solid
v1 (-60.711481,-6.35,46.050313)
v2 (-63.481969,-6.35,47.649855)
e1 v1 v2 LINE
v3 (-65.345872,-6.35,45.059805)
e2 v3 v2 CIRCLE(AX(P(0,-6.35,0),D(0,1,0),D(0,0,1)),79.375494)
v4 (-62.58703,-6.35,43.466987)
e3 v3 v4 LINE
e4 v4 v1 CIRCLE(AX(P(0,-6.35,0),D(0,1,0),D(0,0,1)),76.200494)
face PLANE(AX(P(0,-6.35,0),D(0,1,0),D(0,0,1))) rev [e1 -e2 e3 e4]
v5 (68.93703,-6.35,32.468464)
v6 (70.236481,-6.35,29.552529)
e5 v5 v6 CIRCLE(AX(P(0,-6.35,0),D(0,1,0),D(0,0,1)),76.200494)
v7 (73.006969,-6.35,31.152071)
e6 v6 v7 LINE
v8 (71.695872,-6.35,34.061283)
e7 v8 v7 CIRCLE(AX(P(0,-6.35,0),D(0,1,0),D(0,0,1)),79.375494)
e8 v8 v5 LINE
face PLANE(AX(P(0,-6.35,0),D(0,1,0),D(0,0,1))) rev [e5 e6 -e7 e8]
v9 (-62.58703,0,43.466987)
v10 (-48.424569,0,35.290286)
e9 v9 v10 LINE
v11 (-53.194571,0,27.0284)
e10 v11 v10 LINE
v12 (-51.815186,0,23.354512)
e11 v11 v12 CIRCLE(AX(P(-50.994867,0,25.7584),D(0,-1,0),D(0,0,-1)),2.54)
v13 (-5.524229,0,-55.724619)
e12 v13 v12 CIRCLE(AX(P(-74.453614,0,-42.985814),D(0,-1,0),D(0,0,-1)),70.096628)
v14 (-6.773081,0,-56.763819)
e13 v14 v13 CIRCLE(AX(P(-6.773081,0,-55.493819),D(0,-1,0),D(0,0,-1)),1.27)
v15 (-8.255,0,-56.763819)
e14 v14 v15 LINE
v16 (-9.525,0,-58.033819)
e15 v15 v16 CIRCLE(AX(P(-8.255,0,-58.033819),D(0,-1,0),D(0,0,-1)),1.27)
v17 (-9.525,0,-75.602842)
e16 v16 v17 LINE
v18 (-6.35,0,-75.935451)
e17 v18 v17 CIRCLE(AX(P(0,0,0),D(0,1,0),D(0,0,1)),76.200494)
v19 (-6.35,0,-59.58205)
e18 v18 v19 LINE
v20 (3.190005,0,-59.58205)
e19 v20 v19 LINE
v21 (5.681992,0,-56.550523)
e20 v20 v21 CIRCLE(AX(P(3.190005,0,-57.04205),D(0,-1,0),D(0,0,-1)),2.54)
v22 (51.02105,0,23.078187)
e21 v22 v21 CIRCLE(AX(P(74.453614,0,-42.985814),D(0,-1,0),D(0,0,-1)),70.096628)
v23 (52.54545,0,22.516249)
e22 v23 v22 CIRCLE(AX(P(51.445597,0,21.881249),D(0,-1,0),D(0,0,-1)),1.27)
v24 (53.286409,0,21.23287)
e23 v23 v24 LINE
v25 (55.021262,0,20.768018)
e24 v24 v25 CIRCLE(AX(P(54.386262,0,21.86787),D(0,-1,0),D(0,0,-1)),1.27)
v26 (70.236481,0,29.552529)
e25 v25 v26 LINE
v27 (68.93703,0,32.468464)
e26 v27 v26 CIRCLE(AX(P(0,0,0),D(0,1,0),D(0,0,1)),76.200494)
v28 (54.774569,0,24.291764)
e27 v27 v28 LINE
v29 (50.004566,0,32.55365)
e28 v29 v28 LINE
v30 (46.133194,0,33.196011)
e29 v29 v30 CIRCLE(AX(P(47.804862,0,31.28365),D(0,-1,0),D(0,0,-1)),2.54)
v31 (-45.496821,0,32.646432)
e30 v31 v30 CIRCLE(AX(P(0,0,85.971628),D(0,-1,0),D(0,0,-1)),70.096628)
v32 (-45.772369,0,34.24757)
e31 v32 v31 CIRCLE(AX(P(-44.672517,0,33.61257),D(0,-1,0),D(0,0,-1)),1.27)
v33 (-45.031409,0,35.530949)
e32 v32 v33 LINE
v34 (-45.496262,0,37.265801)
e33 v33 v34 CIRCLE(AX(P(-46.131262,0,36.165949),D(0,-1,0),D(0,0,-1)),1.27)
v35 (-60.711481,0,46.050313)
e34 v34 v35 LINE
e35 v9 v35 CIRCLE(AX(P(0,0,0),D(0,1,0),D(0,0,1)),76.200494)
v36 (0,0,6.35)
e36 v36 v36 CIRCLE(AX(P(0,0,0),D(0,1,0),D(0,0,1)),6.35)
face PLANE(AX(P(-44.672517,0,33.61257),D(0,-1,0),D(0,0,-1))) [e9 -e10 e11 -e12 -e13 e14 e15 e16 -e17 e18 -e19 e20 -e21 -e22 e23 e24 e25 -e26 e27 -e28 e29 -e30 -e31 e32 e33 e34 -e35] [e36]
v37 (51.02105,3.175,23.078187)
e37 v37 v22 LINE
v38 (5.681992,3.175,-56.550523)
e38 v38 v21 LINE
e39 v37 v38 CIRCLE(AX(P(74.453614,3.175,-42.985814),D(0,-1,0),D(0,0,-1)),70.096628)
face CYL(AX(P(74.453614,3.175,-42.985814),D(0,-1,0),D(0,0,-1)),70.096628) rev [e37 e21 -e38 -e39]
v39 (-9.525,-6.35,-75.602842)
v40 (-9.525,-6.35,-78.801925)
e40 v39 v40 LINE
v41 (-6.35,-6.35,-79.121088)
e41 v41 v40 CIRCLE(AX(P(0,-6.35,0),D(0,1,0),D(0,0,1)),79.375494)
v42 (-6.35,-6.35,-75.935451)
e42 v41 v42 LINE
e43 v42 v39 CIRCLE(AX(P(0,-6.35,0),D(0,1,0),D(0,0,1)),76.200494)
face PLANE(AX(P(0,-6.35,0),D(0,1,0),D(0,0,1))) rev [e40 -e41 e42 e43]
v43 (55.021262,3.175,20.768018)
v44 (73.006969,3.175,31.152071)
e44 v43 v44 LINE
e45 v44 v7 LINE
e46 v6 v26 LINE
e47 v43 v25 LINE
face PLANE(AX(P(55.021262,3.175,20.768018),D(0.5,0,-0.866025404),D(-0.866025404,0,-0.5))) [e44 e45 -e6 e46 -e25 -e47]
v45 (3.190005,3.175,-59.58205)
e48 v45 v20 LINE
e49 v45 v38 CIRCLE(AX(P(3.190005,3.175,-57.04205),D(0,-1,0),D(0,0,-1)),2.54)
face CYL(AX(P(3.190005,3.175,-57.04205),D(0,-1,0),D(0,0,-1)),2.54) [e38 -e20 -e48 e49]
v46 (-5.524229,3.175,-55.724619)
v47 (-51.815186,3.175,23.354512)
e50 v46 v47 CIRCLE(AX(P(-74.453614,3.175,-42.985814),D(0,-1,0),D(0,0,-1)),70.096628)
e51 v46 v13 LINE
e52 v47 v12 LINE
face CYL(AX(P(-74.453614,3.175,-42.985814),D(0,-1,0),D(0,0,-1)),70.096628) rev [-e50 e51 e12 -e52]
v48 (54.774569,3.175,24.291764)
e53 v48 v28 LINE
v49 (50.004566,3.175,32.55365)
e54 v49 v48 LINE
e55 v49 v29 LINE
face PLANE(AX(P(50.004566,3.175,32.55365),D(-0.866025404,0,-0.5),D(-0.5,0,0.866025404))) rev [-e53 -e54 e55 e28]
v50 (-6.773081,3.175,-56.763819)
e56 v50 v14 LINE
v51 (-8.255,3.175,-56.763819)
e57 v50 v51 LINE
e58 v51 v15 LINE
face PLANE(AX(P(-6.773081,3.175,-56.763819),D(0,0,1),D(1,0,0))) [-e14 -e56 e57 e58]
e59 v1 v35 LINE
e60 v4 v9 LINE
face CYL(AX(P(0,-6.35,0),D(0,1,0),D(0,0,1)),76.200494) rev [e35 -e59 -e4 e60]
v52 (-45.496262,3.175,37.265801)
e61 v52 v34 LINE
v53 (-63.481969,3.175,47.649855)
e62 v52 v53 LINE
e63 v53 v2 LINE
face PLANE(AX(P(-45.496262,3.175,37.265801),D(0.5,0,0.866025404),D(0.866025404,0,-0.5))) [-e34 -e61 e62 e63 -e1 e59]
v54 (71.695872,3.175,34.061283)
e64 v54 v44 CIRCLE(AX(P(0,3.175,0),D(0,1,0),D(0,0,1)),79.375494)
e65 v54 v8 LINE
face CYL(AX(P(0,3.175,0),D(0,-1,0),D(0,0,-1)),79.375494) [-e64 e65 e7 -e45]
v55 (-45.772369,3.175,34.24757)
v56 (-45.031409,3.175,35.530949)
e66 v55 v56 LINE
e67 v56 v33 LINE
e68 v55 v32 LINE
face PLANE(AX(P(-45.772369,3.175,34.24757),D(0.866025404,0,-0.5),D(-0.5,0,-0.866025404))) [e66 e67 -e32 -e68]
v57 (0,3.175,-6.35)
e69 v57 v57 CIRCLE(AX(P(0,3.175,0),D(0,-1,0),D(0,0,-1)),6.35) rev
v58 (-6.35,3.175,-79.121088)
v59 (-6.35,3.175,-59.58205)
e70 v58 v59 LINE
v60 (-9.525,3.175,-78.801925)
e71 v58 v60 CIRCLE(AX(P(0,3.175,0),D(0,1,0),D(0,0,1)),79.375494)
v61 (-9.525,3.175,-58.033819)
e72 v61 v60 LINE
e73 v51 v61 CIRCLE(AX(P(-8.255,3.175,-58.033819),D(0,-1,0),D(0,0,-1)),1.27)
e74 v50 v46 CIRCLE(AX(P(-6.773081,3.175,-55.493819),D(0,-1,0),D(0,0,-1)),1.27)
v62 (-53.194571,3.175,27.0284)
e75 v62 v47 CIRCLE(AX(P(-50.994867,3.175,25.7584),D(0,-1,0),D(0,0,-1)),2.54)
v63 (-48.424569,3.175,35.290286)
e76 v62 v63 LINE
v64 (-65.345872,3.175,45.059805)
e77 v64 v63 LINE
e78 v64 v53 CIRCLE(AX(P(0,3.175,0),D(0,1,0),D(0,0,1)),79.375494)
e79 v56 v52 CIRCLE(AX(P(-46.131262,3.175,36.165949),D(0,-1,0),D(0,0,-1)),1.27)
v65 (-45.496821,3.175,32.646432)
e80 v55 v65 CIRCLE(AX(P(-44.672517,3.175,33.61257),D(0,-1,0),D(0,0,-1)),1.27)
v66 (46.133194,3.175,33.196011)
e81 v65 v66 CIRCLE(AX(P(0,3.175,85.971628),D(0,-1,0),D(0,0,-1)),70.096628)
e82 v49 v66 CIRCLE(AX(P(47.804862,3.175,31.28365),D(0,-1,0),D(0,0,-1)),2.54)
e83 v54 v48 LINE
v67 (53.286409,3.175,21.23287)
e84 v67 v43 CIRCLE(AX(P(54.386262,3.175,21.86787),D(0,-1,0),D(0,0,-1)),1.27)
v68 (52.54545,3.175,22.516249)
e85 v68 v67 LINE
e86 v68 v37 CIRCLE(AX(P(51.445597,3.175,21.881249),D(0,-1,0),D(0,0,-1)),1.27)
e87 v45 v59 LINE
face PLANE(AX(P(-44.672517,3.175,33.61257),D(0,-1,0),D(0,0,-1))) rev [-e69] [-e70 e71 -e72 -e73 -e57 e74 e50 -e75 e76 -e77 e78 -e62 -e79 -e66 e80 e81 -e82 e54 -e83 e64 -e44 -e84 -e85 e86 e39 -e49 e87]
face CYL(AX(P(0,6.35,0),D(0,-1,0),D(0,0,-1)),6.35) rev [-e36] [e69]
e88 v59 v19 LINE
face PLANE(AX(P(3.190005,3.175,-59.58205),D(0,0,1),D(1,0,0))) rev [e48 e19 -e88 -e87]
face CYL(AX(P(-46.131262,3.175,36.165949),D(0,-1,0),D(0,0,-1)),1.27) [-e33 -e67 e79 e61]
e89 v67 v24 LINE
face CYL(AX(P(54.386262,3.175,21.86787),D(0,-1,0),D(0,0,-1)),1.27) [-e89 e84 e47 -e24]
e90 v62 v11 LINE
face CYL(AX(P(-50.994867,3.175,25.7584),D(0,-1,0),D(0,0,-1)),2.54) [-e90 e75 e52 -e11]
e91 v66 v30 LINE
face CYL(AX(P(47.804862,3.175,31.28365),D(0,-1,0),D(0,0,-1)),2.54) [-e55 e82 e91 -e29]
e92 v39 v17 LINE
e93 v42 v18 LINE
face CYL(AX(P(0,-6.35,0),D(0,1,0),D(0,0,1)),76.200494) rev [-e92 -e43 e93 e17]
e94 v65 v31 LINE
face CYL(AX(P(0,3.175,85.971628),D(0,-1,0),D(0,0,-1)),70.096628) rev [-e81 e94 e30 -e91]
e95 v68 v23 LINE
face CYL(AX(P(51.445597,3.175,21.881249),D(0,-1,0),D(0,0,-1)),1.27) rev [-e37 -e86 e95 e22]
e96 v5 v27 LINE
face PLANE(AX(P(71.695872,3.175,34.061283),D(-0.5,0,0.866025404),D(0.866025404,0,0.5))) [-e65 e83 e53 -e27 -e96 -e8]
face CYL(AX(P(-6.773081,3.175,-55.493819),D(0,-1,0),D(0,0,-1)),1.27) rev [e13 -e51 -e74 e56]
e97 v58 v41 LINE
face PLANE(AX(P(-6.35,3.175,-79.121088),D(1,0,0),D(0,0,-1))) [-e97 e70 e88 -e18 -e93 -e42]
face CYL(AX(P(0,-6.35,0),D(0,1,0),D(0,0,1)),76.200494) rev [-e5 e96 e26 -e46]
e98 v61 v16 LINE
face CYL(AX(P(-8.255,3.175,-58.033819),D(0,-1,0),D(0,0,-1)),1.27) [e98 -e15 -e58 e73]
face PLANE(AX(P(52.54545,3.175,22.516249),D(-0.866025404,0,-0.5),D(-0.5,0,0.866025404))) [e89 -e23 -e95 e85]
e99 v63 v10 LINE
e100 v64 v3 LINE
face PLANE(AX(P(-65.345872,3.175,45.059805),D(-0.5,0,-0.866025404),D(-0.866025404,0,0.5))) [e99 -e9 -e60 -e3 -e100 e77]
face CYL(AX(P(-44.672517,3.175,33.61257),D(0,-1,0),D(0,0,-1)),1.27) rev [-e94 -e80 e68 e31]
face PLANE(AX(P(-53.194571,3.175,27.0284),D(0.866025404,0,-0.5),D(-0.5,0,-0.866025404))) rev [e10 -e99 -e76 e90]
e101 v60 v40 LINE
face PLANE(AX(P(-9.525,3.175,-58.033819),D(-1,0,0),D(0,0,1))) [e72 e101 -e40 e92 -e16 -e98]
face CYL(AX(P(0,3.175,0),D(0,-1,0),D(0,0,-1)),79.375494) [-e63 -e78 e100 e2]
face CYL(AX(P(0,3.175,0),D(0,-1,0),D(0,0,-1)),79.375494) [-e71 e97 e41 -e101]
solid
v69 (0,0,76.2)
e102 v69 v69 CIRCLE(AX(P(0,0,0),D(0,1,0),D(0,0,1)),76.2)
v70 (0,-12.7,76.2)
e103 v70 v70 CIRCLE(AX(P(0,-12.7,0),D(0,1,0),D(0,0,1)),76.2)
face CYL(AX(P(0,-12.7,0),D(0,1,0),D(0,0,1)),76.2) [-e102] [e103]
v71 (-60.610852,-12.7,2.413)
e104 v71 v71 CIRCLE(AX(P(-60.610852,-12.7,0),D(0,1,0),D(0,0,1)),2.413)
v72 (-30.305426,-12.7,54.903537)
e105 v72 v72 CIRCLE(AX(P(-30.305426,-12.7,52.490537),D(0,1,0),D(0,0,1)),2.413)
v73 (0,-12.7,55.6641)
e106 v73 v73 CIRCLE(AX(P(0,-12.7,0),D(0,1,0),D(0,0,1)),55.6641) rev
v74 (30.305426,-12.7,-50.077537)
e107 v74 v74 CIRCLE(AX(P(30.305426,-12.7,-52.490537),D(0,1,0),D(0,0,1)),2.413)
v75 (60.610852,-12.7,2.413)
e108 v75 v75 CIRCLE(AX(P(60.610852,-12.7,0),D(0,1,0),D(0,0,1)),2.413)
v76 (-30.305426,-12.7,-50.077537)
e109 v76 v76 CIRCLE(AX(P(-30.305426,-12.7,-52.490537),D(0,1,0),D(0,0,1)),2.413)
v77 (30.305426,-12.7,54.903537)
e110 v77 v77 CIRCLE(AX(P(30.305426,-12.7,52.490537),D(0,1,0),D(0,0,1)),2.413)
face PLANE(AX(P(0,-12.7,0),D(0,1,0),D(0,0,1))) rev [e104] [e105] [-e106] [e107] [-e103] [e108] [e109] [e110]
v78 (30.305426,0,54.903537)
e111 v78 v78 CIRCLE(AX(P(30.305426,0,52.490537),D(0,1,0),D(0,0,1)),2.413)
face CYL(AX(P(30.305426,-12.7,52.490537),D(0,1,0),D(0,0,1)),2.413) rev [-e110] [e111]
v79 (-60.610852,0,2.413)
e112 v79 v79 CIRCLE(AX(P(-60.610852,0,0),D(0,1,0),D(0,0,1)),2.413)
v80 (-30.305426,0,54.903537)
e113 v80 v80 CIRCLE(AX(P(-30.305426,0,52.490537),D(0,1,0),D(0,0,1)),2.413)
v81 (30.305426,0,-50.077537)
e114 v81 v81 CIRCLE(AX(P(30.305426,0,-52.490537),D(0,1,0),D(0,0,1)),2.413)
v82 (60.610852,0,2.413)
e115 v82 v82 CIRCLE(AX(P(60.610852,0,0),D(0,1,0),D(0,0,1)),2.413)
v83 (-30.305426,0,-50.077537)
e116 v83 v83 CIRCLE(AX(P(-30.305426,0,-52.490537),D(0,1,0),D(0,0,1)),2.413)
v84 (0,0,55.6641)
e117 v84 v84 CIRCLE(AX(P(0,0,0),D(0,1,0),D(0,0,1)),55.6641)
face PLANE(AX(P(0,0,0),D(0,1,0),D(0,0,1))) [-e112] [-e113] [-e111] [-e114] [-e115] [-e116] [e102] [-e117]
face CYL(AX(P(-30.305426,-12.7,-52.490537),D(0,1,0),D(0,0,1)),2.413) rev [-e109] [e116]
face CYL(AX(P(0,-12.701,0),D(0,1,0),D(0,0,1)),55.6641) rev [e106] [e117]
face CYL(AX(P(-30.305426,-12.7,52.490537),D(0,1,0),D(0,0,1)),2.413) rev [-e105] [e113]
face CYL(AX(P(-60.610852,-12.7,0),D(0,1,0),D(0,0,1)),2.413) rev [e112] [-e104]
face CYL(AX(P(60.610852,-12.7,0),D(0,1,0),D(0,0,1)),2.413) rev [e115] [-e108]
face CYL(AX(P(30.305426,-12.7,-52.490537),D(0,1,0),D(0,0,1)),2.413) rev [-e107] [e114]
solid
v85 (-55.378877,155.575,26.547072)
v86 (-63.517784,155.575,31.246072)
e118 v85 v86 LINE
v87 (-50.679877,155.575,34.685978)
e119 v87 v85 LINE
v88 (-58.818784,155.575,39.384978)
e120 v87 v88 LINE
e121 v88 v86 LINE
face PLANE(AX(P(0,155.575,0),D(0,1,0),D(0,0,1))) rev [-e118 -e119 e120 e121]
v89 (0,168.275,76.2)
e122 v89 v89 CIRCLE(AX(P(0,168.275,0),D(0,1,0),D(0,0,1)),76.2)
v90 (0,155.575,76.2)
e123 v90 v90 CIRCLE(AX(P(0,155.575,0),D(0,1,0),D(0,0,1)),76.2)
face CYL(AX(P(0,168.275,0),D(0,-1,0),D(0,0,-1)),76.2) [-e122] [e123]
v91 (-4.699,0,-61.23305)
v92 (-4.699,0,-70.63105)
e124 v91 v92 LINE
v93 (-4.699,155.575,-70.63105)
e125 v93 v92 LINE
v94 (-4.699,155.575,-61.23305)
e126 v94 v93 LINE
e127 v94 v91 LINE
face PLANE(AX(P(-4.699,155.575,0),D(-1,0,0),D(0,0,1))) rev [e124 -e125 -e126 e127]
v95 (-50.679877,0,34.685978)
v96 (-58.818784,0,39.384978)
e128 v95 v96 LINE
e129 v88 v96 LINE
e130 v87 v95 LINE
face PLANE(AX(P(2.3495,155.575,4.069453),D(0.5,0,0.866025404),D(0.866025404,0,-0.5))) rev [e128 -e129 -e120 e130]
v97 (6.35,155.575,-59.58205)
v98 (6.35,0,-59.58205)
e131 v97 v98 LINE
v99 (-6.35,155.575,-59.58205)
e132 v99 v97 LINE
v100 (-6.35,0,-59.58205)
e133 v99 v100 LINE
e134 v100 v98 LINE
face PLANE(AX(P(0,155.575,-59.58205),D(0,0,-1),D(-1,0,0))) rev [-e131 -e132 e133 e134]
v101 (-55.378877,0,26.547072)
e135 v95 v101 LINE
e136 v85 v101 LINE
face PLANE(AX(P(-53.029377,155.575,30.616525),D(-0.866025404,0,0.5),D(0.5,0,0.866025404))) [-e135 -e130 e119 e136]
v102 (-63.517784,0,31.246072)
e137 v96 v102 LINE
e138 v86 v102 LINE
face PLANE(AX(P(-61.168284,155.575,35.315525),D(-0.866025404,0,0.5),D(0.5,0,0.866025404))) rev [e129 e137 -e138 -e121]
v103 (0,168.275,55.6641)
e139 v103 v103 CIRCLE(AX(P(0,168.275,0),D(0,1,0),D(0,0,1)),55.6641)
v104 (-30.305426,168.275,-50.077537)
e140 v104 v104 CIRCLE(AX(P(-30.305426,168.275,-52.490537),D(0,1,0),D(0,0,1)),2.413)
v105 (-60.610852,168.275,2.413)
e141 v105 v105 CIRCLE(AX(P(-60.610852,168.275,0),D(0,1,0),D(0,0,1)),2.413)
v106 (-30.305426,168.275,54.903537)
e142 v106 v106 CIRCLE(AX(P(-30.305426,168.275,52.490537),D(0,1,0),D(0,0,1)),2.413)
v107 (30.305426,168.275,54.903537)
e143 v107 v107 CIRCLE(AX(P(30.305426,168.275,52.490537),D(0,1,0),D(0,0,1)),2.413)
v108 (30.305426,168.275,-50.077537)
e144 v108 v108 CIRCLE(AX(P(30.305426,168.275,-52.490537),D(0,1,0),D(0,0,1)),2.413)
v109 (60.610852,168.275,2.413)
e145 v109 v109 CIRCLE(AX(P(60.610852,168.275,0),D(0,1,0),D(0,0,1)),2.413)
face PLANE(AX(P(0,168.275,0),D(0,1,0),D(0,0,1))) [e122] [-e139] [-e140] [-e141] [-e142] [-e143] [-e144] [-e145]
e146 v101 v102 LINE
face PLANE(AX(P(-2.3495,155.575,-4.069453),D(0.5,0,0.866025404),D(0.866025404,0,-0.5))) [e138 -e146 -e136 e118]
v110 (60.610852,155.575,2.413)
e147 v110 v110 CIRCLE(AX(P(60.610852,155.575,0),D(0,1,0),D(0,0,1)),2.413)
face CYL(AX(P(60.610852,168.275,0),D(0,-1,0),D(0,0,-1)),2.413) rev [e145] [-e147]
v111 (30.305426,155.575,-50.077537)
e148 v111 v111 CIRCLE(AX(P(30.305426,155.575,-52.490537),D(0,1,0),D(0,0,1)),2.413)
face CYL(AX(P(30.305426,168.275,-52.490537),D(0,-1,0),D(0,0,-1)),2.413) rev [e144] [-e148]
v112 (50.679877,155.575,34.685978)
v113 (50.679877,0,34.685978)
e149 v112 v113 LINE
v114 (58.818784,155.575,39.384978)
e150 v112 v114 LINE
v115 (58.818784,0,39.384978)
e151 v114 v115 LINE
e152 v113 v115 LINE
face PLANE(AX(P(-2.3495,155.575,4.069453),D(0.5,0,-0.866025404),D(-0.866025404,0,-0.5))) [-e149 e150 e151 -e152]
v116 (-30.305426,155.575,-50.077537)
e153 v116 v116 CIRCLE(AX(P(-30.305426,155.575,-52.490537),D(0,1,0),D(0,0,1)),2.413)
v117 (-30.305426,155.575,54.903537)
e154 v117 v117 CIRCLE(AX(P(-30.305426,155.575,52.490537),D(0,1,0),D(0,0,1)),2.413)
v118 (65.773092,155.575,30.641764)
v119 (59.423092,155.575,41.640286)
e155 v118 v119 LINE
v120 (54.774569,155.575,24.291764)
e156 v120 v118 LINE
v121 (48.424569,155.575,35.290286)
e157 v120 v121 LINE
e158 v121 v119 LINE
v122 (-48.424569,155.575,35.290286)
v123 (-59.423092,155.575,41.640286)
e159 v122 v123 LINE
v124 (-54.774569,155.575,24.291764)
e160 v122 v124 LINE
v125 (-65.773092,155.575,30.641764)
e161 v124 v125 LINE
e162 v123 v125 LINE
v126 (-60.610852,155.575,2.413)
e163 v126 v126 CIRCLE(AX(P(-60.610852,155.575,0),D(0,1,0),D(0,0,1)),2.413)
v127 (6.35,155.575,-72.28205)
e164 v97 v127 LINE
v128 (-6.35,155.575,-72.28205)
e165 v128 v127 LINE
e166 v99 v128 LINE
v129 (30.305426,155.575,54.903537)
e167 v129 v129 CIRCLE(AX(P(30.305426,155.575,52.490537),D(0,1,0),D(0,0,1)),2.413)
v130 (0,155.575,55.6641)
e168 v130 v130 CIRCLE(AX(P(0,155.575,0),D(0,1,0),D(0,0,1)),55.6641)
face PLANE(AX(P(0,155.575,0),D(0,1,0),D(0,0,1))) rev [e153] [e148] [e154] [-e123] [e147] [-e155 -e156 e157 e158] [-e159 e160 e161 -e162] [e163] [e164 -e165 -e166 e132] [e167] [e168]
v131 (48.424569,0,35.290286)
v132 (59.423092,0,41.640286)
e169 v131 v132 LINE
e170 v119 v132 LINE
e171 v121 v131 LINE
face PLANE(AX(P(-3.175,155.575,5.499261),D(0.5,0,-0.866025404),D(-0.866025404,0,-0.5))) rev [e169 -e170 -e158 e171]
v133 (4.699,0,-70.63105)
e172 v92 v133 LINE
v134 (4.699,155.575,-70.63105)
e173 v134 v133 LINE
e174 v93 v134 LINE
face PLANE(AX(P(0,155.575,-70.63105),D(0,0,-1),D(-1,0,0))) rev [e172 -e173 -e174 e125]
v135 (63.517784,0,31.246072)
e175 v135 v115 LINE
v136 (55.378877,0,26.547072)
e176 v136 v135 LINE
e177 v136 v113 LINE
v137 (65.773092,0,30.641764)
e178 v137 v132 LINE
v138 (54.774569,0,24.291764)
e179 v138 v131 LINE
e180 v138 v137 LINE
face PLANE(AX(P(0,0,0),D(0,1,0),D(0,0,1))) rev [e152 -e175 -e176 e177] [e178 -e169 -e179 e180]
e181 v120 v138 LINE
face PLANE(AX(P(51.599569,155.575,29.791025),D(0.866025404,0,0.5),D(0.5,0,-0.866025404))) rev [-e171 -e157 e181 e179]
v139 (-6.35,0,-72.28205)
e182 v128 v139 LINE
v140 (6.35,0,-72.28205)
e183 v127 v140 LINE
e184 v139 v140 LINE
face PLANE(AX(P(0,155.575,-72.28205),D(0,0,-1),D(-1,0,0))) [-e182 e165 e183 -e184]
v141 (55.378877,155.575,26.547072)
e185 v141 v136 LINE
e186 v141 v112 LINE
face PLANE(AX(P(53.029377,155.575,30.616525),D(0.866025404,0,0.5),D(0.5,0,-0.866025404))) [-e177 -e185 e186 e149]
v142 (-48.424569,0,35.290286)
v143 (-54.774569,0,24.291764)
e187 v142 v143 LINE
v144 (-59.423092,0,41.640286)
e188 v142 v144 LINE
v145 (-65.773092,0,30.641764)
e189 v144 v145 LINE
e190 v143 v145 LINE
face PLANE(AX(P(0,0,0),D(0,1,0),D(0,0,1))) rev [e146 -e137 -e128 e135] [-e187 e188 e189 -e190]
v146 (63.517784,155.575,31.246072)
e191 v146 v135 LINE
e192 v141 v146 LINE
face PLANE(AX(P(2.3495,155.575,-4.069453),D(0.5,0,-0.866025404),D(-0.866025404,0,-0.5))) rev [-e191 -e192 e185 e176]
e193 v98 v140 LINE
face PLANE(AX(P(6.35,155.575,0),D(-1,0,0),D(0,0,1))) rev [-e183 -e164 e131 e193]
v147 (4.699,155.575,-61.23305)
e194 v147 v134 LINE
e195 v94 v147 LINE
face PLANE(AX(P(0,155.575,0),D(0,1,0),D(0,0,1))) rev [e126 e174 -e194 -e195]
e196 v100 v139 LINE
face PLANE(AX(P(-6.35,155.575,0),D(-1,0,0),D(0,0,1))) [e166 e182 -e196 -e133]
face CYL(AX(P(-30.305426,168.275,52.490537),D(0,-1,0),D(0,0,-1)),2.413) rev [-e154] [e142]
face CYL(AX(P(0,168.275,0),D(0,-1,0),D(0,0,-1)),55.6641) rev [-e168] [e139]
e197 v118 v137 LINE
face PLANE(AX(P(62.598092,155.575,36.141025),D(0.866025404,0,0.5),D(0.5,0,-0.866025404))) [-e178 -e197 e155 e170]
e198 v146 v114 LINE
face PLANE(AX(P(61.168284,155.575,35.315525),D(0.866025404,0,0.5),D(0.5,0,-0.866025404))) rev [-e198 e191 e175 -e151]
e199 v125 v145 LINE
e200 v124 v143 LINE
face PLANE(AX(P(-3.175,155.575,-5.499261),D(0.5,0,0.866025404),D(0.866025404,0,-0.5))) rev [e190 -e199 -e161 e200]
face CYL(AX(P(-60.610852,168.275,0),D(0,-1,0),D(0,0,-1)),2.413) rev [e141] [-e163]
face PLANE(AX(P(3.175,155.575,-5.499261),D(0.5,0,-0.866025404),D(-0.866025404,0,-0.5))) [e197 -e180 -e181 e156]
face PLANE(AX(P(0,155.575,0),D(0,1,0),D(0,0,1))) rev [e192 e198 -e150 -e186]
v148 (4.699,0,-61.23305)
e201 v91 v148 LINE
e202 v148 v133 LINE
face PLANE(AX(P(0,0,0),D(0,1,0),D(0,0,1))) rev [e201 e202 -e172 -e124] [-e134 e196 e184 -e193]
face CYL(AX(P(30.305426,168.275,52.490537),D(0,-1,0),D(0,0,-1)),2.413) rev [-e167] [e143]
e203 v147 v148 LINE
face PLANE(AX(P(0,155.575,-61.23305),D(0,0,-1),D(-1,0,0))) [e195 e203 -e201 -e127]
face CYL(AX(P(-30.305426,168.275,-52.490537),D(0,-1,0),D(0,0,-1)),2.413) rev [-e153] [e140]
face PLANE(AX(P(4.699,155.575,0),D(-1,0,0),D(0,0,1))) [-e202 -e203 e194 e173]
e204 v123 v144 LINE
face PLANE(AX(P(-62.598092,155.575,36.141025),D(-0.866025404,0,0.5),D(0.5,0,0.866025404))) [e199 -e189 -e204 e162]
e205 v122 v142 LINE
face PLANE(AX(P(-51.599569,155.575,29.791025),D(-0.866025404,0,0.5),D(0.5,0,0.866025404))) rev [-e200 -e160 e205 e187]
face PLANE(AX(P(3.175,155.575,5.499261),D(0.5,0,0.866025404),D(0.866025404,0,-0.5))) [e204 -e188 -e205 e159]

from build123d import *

# Parameters (mm, degrees)
SKETCH1_R                    = 76.2
SKETCH1_R_2                  = 2.413
BOSS_EXTRUDE1_DEPTH          = 12.7
BOSS_EXTRUDE2_DEPTH          = 155.575
BOSS_EXTRUDE3_START          = 12.7
SKETCH2_R                    = 76.2
SKETCH2_R_2                  = 2.413
SKETCH2_R_3                  = 55.6641
BOSS_EXTRUDE3_DEPTH          = 12.7
ALIGNMENT_PRINTED_PART_DEPTH = 3.175
BOSS_EXTRUDE6_START          = -6.35
BOSS_EXTRUDE6_DEPTH          = 6.35
SKETCH3_8_R                  = 6.35
CUT_EXTRUDE1_DEPTH           = 6.35
SKETCH4_R                    = 55.6641
CUT_EXTRUDE2_DEPTH           = 12.7


# Read off the part's stored shape, not the designer's step: Boss-Extrude6
with BuildPart() as part:
    # Sketch1 → Boss-Extrude1 (new body)
    with BuildSketch(Plane(origin=(0, 0, 0), x_dir=(1, 0, 0), z_dir=(0, 1, 0))):
        with Locations(Location((0, 0, 0), (0, 0, 270))):
            Circle(SKETCH1_R)
        with Locations(Location((30.3054258, 52.490537231, 0), (0, 0, 270))):
            Circle(SKETCH1_R_2, mode=Mode.SUBTRACT)
        with Locations(Location((60.6108516, 0, 0), (0, 0, 270))):
            Circle(SKETCH1_R_2, mode=Mode.SUBTRACT)
        with Locations(Location((30.3054258, -52.490537231, 0), (0, 0, 270))):
            Circle(SKETCH1_R_2, mode=Mode.SUBTRACT)
        with Locations(Location((-30.3054258, -52.490537231, 0), (0, 0, 270))):
            Circle(SKETCH1_R_2, mode=Mode.SUBTRACT)
        with Locations(Location((-60.6108516, 0, 0), (0, 0, 270))):
            Circle(SKETCH1_R_2, mode=Mode.SUBTRACT)
        with Locations(Location((-30.3054258, 52.490537231, 0), (0, 0, 270))):
            Circle(SKETCH1_R_2, mode=Mode.SUBTRACT)
    extrude(amount=-BOSS_EXTRUDE1_DEPTH)

    # Sketch4 → Cut-Extrude2 (cut)
    with BuildSketch(Plane(origin=(0, 0, 0), x_dir=(1, 0, 0), z_dir=(0, 1, 0))):
        with Locations(Location((0, 0, 0), (0, 0, 270))):
            Circle(SKETCH4_R)
    extrude(amount=-CUT_EXTRUDE2_DEPTH, mode=Mode.SUBTRACT)


with BuildPart() as body_2:
    # Sketch1<5> → Boss-Extrude2 (new body)
    # profile 1 of 4: a face of its own
    with BuildSketch(Plane(origin=(0, 0, 0), x_dir=(1, 0, 0), z_dir=(0, 1, 0))):
        Polygon((65.773091538, -30.641763686), (59.423091538, -41.640286314), (48.42456891, -35.290286314), (54.77456891, -24.291763686), align=None)
        Polygon((55.378876851, -26.547071628), (50.679876851, -34.685978372), (58.818783596, -39.384978372), (63.517783596, -31.246071628), align=None, mode=Mode.SUBTRACT)
    # profile 2 of 4: a face of its own
    with BuildSketch(Plane(origin=(0, 0, 0), x_dir=(1, 0, 0), z_dir=(0, 1, 0))):
        Polygon((-59.423091538, -41.640286314), (-65.773091538, -30.641763686), (-54.77456891, -24.291763686), (-48.42456891, -35.290286314), align=None)
        Polygon((-50.679876851, -34.685978372), (-55.378876851, -26.547071628), (-63.517783596, -31.246071628), (-58.818783596, -39.384978372), align=None, mode=Mode.SUBTRACT)
    # profile 3 of 4: a face of its own
    with BuildSketch(Plane(origin=(0, 0, 0), x_dir=(1, 0, 0), z_dir=(0, 1, 0))):
        Polygon((0, 61.23305), (0, 59.58205), (6.35, 59.58205), (6.35, 72.28205), (0, 72.28205), (0, 70.63105), (4.699, 70.63105), (4.699, 61.23305), align=None)
    # profile 4 of 4: a face of its own
    with BuildSketch(Plane(origin=(0, 0, 0), x_dir=(1, 0, 0), z_dir=(0, 1, 0))):
        Polygon((-6.35, 59.58205), (0, 59.58205), (0, 61.23305), (-4.699, 61.23305), (-4.699, 70.63105), (0, 70.63105), (0, 72.28205), (-6.35, 72.28205), align=None)
    extrude(amount=BOSS_EXTRUDE2_DEPTH)

    # Sketch2 → Boss-Extrude3 (add)
    with BuildSketch(Plane(origin=(0, 155.575, 0), x_dir=(1, 0, 0), z_dir=(0, 1, 0)).offset(BOSS_EXTRUDE3_START)):
        with Locations(Location((0, 0, 0), (0, 0, 270))):
            Circle(SKETCH2_R)
        with Locations(Location((30.3054258, -52.490537231, 0), (0, 0, 270))):
            Circle(SKETCH2_R_2, mode=Mode.SUBTRACT)
        with Locations(Location((-30.3054258, 52.490537231, 0), (0, 0, 270))):
            Circle(SKETCH2_R_2, mode=Mode.SUBTRACT)
        with Locations(Location((-60.6108516, 0, 0), (0, 0, 270))):
            Circle(SKETCH2_R_2, mode=Mode.SUBTRACT)
        with Locations(Location((-30.3054258, -52.490537231, 0), (0, 0, 270))):
            Circle(SKETCH2_R_2, mode=Mode.SUBTRACT)
        with Locations(Location((60.6108516, 0, 0), (0, 0, 270))):
            Circle(SKETCH2_R_2, mode=Mode.SUBTRACT)
        with Locations(Location((30.3054258, 52.490537231, 0), (0, 0, 270))):
            Circle(SKETCH2_R_2, mode=Mode.SUBTRACT)
        with Locations(Location((0, 0, 0), (0, 0, 270))):
            Circle(SKETCH2_R_3, mode=Mode.SUBTRACT)
    extrude(amount=-BOSS_EXTRUDE3_DEPTH)


with BuildPart() as body_3:
    # Sketch3 → Alignment printed part (new body)
    with BuildSketch(Plane(origin=(0, 0, 0), x_dir=(1, 0, 0), z_dir=(0, 1, 0))):
        with BuildLine():
            Line((50.004566484, -32.553650239), (54.77456891, -24.291763686))
            Line((54.77456891, -24.291763686), (71.695872062, -34.061282616))
            ThreePointArc((71.695872062, -34.061282616), (72.366041342, -32.613265777), (73.006969112, -31.152070642))
            Line((73.006969112, -31.152070642), (55.021261536, -20.768017531))
            ThreePointArc((55.021261536, -20.768017531), (54.057561349, -20.641143994), (53.286409273, -21.232869794))
            Line((53.286409273, -21.232869794), (52.545449715, -22.516249395))
            ThreePointArc((52.545449715, -22.516249395), (51.884861065, -23.072864886), (51.021049833, -23.07818687))
            ThreePointArc((51.021049833, -23.07818687), (13.539035771, 8.302223729), (5.68199232, 56.550523344))
            ThreePointArc((5.68199232, 56.550523344), (5.152156438, 58.654985568), (3.190004851, 59.58205))
            Line((3.190004851, 59.58205), (-6.35, 59.58205))
            Line((-6.35, 59.58205), (-6.35, 79.12108786))
            ThreePointArc((-6.35, 79.12108786), (-7.939104008, 78.977463062), (-9.525, 78.801925225))
            Line((-9.525, 78.801925225), (-9.525, 58.033819004))
            ThreePointArc((-9.525, 58.033819004), (-9.153025612, 57.135793392), (-8.255, 56.763819004))
            Line((-8.255, 56.763819004), (-6.773080883, 56.763819004))
            ThreePointArc((-6.773080883, 56.763819004), (-5.960743403, 56.470040197), (-5.524228814, 55.724618718))
            ThreePointArc((-5.524228814, 55.724618718), (-13.959454543, 7.574037056), (-51.815185973, -23.354511979))
            ThreePointArc((-51.815185973, -23.354511979), (-53.37278578, -24.865594424), (-53.194571335, -27.028399761))
            Line((-53.194571335, -27.028399761), (-48.42456891, -35.290286314))
            Line((-48.42456891, -35.290286314), (-65.345872062, -45.059805244))
            ThreePointArc((-65.345872062, -45.059805244), (-64.426937334, -46.364197285), (-63.481969112, -47.649854584))
            Line((-63.481969112, -47.649854584), (-45.496261536, -37.265801473))
            ThreePointArc((-45.496261536, -37.265801473), (-44.904535737, -36.494649397), (-45.031409273, -35.53094921))
            Line((-45.031409273, -35.53094921), (-45.772368831, -34.247569609))
            ThreePointArc((-45.772368831, -34.247569609), (-45.924117662, -33.397175311), (-45.496821019, -32.646431848))
            ThreePointArc((-45.496821019, -32.646431848), (0.420418772, -15.876260785), (46.133193653, -33.196011365))
            ThreePointArc((46.133193653, -33.196011365), (48.220629341, -33.789391144), (50.004566484, -32.553650239))
        make_face()
    extrude(amount=ALIGNMENT_PRINTED_PART_DEPTH)

    # Boss-Extrude6 outline → Boss-Extrude6 (add)
    with BuildSketch(Plane(origin=(0, 0, 0), x_dir=(1, 0, 0), z_dir=(0, 1, 0)).offset(BOSS_EXTRUDE6_START)):
        with BuildLine():
            ThreePointArc((70.236481421, -29.552528827), (69.602027548, -31.017302326), (68.937029978, -32.468464396))
            Line((68.937029978, -32.468464396), (71.695872062, -34.061282616))
            ThreePointArc((71.695872062, -34.061282616), (72.366041342, -32.613265777), (73.006969112, -31.152070642))
            Line((73.006969112, -31.152070642), (70.236481421, -29.552528827))
        make_face()
        with BuildLine():
            ThreePointArc((-6.35, 79.12108786), (-7.939104008, 78.977463062), (-9.525, 78.801925225))
            Line((-9.525, 78.801925225), (-9.525, 75.602841596))
            ThreePointArc((-9.525, 75.602841596), (-7.939242002, 75.785775175), (-6.35, 75.935451421))
            Line((-6.35, 75.935451421), (-6.35, 79.12108786))
        make_face()
        with BuildLine():
            ThreePointArc((-65.345872062, -45.059805244), (-64.426937334, -46.364197285), (-63.481969112, -47.649854584))
            Line((-63.481969112, -47.649854584), (-60.711481421, -46.050312769))
            ThreePointArc((-60.711481421, -46.050312769), (-61.662785546, -44.768472848), (-62.587029978, -43.466987024))
            Line((-62.587029978, -43.466987024), (-65.345872062, -45.059805244))
        make_face()
    extrude(amount=BOSS_EXTRUDE6_DEPTH)

    # Sketch3<8> → Cut-Extrude1 (cut)
    with BuildSketch(Plane(origin=(0, 0, 0), x_dir=(1, 0, 0), z_dir=(0, 1, 0))):
        with Locations(Location((0, 0, 0), (0, 0, 90))):
            Circle(SKETCH3_8_R)
    extrude(amount=CUT_EXTRUDE1_DEPTH, mode=Mode.SUBTRACT)


solid = Compound([part.part, body_2.part, body_3.part])
